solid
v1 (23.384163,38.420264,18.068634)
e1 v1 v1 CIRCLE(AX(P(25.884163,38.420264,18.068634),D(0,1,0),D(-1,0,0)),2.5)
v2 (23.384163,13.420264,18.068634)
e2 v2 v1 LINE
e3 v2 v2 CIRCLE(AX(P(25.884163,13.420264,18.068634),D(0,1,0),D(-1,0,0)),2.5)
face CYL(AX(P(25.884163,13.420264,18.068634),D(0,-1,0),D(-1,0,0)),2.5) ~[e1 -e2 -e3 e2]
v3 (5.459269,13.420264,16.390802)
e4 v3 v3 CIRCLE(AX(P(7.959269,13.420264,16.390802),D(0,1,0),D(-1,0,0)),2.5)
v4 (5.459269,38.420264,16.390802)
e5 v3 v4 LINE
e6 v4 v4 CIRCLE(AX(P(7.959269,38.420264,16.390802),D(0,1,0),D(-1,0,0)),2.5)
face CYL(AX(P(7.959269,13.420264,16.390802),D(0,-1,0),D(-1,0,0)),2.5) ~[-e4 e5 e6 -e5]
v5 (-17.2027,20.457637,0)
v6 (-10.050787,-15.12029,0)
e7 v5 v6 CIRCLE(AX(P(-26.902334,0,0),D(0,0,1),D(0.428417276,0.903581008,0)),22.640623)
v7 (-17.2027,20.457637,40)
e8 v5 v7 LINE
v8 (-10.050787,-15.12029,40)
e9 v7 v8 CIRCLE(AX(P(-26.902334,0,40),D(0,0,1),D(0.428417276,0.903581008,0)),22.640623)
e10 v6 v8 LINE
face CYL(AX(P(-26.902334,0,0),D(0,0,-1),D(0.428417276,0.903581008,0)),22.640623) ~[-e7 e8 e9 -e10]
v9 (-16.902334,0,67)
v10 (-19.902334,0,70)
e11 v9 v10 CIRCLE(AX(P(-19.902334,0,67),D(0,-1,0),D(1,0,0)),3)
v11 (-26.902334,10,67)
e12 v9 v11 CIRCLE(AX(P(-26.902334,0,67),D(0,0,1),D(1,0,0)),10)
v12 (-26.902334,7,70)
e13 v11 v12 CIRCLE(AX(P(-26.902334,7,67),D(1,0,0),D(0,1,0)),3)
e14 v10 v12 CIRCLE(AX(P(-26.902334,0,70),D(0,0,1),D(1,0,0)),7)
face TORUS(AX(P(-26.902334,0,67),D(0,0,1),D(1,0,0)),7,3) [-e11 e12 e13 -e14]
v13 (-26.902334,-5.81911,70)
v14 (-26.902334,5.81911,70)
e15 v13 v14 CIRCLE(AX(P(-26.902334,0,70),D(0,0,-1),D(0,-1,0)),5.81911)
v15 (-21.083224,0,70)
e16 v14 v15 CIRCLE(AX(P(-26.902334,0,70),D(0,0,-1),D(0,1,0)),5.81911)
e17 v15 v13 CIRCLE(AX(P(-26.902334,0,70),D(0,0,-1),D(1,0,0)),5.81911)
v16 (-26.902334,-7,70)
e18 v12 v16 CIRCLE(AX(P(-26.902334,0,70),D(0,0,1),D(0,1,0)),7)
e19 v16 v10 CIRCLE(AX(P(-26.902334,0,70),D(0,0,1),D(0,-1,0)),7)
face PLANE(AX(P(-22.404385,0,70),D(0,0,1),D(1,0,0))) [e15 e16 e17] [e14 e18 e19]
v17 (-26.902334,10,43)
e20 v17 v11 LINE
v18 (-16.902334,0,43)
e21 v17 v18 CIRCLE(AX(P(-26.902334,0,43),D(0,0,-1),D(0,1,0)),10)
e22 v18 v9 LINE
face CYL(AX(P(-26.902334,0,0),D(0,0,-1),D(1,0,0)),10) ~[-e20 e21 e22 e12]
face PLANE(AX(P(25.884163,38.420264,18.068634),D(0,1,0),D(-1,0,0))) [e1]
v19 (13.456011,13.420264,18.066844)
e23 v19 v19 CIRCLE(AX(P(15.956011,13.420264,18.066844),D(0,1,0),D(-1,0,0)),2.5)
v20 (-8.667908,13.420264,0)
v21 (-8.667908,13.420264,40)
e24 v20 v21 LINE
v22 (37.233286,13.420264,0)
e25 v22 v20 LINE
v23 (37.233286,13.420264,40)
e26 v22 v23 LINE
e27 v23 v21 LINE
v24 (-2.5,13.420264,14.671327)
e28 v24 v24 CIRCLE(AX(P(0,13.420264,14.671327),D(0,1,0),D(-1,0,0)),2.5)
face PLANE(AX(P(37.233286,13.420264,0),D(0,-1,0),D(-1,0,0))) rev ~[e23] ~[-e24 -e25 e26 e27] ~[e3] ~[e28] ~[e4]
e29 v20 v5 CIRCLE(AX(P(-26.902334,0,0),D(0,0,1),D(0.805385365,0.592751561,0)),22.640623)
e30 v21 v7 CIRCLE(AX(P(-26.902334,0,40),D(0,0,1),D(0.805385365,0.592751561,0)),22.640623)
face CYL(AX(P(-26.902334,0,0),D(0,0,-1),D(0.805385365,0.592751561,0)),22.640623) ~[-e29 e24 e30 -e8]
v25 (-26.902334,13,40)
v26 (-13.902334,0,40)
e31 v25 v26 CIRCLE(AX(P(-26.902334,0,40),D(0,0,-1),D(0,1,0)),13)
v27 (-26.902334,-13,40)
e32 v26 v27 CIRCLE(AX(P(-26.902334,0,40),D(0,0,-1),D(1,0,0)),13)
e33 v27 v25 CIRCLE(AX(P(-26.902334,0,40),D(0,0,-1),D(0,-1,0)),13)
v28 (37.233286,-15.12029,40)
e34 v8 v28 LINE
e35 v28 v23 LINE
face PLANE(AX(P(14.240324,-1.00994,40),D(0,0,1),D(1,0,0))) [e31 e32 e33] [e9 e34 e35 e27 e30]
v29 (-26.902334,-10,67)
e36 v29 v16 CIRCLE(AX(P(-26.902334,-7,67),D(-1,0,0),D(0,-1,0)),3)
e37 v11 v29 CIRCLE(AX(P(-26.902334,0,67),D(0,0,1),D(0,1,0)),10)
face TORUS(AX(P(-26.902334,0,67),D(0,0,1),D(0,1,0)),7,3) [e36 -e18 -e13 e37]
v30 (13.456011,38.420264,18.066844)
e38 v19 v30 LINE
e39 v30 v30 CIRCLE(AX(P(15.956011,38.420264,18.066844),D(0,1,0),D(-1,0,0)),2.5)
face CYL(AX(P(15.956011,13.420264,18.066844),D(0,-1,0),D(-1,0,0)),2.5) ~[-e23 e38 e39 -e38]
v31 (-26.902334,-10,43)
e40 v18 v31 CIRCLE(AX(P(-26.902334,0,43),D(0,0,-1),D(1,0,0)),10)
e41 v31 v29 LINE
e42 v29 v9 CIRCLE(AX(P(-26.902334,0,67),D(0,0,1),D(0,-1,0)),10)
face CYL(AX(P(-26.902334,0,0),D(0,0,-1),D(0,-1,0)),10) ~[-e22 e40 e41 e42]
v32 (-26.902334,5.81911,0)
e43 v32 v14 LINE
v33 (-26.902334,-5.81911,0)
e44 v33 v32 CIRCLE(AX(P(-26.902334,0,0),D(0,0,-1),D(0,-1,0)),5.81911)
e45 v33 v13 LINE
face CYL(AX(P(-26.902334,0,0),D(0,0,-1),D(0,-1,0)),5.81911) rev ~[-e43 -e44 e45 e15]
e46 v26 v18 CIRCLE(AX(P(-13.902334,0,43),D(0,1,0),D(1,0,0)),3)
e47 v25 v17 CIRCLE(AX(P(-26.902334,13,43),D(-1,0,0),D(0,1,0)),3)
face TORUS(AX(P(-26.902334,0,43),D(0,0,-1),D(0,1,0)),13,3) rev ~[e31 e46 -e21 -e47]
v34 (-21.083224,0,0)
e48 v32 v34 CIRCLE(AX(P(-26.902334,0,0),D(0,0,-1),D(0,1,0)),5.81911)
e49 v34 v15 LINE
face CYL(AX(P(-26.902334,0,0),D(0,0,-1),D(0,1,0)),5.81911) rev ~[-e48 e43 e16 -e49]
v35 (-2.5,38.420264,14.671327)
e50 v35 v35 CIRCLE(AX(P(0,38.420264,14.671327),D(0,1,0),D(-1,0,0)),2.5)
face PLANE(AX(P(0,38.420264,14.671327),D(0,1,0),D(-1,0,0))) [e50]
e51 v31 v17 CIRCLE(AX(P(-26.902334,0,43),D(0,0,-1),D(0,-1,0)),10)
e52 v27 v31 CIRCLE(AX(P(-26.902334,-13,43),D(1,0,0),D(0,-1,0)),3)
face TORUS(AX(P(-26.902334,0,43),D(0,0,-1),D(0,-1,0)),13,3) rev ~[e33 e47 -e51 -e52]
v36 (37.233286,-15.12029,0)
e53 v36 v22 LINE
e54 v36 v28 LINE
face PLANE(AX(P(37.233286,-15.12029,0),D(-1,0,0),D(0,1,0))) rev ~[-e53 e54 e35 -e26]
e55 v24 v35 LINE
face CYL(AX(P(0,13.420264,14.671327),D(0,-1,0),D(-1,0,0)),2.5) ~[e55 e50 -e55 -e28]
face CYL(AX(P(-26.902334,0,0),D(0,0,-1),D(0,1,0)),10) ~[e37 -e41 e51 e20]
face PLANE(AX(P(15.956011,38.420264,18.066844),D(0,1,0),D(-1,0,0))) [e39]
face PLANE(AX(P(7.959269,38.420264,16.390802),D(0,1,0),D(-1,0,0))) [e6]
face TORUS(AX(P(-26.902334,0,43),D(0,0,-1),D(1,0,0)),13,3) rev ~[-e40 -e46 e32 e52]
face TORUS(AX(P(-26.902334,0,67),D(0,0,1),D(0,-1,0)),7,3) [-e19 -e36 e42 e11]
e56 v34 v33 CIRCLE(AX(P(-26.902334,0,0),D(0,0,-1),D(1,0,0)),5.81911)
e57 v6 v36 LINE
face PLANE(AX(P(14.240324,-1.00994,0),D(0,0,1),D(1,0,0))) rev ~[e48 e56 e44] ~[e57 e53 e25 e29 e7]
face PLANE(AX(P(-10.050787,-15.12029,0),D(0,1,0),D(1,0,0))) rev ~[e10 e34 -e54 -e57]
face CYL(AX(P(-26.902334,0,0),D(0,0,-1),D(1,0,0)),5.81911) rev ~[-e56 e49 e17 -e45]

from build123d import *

# Parameters (mm, degrees)
F1_DEPTH = 70
F2_DEPTH = 40
F3_R     = 3
F4_R     = 2.5
F5_DEPTH = 25


with BuildPart() as f1:
    # F0 (on Top) → F1 (new body)
    with BuildSketch(Plane.XY):
        with BuildLine():
            ThreePointArc((-16.9023339674, 0), (-19.8312661555, 7.0710678119), (-26.9023339674, 10))
            Line((-26.9023339674, 10), (-26.9023339674, 5.8191100826))
            ThreePointArc((-26.9023339674, 5.8191100826), (-22.7876017675, 4.1147321999), (-21.0832238848, 0))
            ThreePointArc((-21.0832238848, 0), (-22.7876017675, -4.1147321999), (-26.9023339674, -5.8191100826))
            Line((-26.9023339674, -5.8191100826), (-26.9023339674, -10))
            ThreePointArc((-26.9023339674, -10), (-19.8312661555, -7.0710678119), (-16.9023339674, 0))
        make_face()
        with BuildLine():
            Line((-26.9023339674, 5.8191100826), (-26.9023339674, 10))
            ThreePointArc((-26.9023339674, 10), (-36.9023339674, 0), (-26.9023339674, -10))
            Line((-26.9023339674, -10), (-26.9023339674, -5.8191100826))
            ThreePointArc((-26.9023339674, -5.8191100826), (-32.7214440499, 0), (-26.9023339674, 5.8191100826))
        make_face()
    extrude(amount=F1_DEPTH)

    # F0 (on Top) → F2 (join)
    with BuildSketch(Plane.XY):
        with BuildLine():
            Line((37.2332856059, 13.4202644998), (21.7927563936, 13.4202644998))
            Line((21.7927563936, 13.4202644998), (-8.6679077107, 13.4202644998))
            ThreePointArc((-8.6679077107, 13.4202644998), (-5.391446413, 7.0625432229), (-4.261711181, 0))
            ThreePointArc((-4.261711181, 0), (-5.7584541043, -8.0953162068), (-10.0507873126, -15.1202901922))
            Line((-10.0507873126, -15.1202901922), (37.2332856059, -15.1202901922))
            Line((37.2332856059, -15.1202901922), (37.2332856059, 13.4202644998))
        make_face()
        with BuildLine():
            ThreePointArc((-4.261711181, 0), (-5.391446413, 7.0625432229), (-8.6679077107, 13.4202644998))
            Line((-8.6679077107, 13.4202644998), (-26.9023339674, 13.4202644998))
            Line((-26.9023339674, 13.4202644998), (-26.9023339674, 10))
            ThreePointArc((-26.9023339674, 10), (-19.8312661555, 7.0710678119), (-16.9023339674, 0))
            ThreePointArc((-16.9023339674, 0), (-19.8312661555, -7.0710678119), (-26.9023339674, -10))
            Line((-26.9023339674, -10), (-26.9023339674, -15.1202901922))
            Line((-26.9023339674, -15.1202901922), (-10.0507873126, -15.1202901922))
            ThreePointArc((-10.0507873126, -15.1202901922), (-5.7584541043, -8.0953162068), (-4.261711181, 0))
        make_face()
        with BuildLine():
            Line((-26.9023339674, 13.4202644998), (-8.6679077107, 13.4202644998))
            ThreePointArc((-8.6679077107, 13.4202644998), (-12.4988940391, 17.468220241), (-17.2027000327, 20.4576367571))
            ThreePointArc((-17.2027000327, 20.4576367571), (-49.0989219749, -4.4619817321), (-10.0507873126, -15.1202901922))
            Line((-10.0507873126, -15.1202901922), (-26.9023339674, -15.1202901922))
            Line((-26.9023339674, -15.1202901922), (-26.9023339674, -10))
            ThreePointArc((-26.9023339674, -10), (-36.9023339674, 0), (-26.9023339674, 10))
            Line((-26.9023339674, 10), (-26.9023339674, 13.4202644998))
        make_face()
    extrude(amount=F2_DEPTH)

    # F3
    f3_edges = [f1.edges().sort_by_distance(p)[0] for p in [
        (-36.902334, 0, 40),
        (-16.902334, 0, 55),
        (-36.902334, 0, 70),
    ]]
    fillet(f3_edges, radius=F3_R)

    # F4 (on face) → F5 (join)
    with BuildSketch(Plane(origin=(0, 13.4202644998, 0), x_dir=(-1, 0, 0), z_dir=(0, 1, 0))):
        with Locations((-25.8841626346, 18.0686339736)):
            Circle(F4_R)
        with Locations((-15.9560106695, 18.0668439716)):
            Circle(F4_R)
        with Locations((-7.9592689872, 16.3908023387)):
            Circle(F4_R)
        with Locations((0, 14.6713265902)):
            Circle(F4_R)
    extrude(amount=F5_DEPTH)


solid = f1.part
